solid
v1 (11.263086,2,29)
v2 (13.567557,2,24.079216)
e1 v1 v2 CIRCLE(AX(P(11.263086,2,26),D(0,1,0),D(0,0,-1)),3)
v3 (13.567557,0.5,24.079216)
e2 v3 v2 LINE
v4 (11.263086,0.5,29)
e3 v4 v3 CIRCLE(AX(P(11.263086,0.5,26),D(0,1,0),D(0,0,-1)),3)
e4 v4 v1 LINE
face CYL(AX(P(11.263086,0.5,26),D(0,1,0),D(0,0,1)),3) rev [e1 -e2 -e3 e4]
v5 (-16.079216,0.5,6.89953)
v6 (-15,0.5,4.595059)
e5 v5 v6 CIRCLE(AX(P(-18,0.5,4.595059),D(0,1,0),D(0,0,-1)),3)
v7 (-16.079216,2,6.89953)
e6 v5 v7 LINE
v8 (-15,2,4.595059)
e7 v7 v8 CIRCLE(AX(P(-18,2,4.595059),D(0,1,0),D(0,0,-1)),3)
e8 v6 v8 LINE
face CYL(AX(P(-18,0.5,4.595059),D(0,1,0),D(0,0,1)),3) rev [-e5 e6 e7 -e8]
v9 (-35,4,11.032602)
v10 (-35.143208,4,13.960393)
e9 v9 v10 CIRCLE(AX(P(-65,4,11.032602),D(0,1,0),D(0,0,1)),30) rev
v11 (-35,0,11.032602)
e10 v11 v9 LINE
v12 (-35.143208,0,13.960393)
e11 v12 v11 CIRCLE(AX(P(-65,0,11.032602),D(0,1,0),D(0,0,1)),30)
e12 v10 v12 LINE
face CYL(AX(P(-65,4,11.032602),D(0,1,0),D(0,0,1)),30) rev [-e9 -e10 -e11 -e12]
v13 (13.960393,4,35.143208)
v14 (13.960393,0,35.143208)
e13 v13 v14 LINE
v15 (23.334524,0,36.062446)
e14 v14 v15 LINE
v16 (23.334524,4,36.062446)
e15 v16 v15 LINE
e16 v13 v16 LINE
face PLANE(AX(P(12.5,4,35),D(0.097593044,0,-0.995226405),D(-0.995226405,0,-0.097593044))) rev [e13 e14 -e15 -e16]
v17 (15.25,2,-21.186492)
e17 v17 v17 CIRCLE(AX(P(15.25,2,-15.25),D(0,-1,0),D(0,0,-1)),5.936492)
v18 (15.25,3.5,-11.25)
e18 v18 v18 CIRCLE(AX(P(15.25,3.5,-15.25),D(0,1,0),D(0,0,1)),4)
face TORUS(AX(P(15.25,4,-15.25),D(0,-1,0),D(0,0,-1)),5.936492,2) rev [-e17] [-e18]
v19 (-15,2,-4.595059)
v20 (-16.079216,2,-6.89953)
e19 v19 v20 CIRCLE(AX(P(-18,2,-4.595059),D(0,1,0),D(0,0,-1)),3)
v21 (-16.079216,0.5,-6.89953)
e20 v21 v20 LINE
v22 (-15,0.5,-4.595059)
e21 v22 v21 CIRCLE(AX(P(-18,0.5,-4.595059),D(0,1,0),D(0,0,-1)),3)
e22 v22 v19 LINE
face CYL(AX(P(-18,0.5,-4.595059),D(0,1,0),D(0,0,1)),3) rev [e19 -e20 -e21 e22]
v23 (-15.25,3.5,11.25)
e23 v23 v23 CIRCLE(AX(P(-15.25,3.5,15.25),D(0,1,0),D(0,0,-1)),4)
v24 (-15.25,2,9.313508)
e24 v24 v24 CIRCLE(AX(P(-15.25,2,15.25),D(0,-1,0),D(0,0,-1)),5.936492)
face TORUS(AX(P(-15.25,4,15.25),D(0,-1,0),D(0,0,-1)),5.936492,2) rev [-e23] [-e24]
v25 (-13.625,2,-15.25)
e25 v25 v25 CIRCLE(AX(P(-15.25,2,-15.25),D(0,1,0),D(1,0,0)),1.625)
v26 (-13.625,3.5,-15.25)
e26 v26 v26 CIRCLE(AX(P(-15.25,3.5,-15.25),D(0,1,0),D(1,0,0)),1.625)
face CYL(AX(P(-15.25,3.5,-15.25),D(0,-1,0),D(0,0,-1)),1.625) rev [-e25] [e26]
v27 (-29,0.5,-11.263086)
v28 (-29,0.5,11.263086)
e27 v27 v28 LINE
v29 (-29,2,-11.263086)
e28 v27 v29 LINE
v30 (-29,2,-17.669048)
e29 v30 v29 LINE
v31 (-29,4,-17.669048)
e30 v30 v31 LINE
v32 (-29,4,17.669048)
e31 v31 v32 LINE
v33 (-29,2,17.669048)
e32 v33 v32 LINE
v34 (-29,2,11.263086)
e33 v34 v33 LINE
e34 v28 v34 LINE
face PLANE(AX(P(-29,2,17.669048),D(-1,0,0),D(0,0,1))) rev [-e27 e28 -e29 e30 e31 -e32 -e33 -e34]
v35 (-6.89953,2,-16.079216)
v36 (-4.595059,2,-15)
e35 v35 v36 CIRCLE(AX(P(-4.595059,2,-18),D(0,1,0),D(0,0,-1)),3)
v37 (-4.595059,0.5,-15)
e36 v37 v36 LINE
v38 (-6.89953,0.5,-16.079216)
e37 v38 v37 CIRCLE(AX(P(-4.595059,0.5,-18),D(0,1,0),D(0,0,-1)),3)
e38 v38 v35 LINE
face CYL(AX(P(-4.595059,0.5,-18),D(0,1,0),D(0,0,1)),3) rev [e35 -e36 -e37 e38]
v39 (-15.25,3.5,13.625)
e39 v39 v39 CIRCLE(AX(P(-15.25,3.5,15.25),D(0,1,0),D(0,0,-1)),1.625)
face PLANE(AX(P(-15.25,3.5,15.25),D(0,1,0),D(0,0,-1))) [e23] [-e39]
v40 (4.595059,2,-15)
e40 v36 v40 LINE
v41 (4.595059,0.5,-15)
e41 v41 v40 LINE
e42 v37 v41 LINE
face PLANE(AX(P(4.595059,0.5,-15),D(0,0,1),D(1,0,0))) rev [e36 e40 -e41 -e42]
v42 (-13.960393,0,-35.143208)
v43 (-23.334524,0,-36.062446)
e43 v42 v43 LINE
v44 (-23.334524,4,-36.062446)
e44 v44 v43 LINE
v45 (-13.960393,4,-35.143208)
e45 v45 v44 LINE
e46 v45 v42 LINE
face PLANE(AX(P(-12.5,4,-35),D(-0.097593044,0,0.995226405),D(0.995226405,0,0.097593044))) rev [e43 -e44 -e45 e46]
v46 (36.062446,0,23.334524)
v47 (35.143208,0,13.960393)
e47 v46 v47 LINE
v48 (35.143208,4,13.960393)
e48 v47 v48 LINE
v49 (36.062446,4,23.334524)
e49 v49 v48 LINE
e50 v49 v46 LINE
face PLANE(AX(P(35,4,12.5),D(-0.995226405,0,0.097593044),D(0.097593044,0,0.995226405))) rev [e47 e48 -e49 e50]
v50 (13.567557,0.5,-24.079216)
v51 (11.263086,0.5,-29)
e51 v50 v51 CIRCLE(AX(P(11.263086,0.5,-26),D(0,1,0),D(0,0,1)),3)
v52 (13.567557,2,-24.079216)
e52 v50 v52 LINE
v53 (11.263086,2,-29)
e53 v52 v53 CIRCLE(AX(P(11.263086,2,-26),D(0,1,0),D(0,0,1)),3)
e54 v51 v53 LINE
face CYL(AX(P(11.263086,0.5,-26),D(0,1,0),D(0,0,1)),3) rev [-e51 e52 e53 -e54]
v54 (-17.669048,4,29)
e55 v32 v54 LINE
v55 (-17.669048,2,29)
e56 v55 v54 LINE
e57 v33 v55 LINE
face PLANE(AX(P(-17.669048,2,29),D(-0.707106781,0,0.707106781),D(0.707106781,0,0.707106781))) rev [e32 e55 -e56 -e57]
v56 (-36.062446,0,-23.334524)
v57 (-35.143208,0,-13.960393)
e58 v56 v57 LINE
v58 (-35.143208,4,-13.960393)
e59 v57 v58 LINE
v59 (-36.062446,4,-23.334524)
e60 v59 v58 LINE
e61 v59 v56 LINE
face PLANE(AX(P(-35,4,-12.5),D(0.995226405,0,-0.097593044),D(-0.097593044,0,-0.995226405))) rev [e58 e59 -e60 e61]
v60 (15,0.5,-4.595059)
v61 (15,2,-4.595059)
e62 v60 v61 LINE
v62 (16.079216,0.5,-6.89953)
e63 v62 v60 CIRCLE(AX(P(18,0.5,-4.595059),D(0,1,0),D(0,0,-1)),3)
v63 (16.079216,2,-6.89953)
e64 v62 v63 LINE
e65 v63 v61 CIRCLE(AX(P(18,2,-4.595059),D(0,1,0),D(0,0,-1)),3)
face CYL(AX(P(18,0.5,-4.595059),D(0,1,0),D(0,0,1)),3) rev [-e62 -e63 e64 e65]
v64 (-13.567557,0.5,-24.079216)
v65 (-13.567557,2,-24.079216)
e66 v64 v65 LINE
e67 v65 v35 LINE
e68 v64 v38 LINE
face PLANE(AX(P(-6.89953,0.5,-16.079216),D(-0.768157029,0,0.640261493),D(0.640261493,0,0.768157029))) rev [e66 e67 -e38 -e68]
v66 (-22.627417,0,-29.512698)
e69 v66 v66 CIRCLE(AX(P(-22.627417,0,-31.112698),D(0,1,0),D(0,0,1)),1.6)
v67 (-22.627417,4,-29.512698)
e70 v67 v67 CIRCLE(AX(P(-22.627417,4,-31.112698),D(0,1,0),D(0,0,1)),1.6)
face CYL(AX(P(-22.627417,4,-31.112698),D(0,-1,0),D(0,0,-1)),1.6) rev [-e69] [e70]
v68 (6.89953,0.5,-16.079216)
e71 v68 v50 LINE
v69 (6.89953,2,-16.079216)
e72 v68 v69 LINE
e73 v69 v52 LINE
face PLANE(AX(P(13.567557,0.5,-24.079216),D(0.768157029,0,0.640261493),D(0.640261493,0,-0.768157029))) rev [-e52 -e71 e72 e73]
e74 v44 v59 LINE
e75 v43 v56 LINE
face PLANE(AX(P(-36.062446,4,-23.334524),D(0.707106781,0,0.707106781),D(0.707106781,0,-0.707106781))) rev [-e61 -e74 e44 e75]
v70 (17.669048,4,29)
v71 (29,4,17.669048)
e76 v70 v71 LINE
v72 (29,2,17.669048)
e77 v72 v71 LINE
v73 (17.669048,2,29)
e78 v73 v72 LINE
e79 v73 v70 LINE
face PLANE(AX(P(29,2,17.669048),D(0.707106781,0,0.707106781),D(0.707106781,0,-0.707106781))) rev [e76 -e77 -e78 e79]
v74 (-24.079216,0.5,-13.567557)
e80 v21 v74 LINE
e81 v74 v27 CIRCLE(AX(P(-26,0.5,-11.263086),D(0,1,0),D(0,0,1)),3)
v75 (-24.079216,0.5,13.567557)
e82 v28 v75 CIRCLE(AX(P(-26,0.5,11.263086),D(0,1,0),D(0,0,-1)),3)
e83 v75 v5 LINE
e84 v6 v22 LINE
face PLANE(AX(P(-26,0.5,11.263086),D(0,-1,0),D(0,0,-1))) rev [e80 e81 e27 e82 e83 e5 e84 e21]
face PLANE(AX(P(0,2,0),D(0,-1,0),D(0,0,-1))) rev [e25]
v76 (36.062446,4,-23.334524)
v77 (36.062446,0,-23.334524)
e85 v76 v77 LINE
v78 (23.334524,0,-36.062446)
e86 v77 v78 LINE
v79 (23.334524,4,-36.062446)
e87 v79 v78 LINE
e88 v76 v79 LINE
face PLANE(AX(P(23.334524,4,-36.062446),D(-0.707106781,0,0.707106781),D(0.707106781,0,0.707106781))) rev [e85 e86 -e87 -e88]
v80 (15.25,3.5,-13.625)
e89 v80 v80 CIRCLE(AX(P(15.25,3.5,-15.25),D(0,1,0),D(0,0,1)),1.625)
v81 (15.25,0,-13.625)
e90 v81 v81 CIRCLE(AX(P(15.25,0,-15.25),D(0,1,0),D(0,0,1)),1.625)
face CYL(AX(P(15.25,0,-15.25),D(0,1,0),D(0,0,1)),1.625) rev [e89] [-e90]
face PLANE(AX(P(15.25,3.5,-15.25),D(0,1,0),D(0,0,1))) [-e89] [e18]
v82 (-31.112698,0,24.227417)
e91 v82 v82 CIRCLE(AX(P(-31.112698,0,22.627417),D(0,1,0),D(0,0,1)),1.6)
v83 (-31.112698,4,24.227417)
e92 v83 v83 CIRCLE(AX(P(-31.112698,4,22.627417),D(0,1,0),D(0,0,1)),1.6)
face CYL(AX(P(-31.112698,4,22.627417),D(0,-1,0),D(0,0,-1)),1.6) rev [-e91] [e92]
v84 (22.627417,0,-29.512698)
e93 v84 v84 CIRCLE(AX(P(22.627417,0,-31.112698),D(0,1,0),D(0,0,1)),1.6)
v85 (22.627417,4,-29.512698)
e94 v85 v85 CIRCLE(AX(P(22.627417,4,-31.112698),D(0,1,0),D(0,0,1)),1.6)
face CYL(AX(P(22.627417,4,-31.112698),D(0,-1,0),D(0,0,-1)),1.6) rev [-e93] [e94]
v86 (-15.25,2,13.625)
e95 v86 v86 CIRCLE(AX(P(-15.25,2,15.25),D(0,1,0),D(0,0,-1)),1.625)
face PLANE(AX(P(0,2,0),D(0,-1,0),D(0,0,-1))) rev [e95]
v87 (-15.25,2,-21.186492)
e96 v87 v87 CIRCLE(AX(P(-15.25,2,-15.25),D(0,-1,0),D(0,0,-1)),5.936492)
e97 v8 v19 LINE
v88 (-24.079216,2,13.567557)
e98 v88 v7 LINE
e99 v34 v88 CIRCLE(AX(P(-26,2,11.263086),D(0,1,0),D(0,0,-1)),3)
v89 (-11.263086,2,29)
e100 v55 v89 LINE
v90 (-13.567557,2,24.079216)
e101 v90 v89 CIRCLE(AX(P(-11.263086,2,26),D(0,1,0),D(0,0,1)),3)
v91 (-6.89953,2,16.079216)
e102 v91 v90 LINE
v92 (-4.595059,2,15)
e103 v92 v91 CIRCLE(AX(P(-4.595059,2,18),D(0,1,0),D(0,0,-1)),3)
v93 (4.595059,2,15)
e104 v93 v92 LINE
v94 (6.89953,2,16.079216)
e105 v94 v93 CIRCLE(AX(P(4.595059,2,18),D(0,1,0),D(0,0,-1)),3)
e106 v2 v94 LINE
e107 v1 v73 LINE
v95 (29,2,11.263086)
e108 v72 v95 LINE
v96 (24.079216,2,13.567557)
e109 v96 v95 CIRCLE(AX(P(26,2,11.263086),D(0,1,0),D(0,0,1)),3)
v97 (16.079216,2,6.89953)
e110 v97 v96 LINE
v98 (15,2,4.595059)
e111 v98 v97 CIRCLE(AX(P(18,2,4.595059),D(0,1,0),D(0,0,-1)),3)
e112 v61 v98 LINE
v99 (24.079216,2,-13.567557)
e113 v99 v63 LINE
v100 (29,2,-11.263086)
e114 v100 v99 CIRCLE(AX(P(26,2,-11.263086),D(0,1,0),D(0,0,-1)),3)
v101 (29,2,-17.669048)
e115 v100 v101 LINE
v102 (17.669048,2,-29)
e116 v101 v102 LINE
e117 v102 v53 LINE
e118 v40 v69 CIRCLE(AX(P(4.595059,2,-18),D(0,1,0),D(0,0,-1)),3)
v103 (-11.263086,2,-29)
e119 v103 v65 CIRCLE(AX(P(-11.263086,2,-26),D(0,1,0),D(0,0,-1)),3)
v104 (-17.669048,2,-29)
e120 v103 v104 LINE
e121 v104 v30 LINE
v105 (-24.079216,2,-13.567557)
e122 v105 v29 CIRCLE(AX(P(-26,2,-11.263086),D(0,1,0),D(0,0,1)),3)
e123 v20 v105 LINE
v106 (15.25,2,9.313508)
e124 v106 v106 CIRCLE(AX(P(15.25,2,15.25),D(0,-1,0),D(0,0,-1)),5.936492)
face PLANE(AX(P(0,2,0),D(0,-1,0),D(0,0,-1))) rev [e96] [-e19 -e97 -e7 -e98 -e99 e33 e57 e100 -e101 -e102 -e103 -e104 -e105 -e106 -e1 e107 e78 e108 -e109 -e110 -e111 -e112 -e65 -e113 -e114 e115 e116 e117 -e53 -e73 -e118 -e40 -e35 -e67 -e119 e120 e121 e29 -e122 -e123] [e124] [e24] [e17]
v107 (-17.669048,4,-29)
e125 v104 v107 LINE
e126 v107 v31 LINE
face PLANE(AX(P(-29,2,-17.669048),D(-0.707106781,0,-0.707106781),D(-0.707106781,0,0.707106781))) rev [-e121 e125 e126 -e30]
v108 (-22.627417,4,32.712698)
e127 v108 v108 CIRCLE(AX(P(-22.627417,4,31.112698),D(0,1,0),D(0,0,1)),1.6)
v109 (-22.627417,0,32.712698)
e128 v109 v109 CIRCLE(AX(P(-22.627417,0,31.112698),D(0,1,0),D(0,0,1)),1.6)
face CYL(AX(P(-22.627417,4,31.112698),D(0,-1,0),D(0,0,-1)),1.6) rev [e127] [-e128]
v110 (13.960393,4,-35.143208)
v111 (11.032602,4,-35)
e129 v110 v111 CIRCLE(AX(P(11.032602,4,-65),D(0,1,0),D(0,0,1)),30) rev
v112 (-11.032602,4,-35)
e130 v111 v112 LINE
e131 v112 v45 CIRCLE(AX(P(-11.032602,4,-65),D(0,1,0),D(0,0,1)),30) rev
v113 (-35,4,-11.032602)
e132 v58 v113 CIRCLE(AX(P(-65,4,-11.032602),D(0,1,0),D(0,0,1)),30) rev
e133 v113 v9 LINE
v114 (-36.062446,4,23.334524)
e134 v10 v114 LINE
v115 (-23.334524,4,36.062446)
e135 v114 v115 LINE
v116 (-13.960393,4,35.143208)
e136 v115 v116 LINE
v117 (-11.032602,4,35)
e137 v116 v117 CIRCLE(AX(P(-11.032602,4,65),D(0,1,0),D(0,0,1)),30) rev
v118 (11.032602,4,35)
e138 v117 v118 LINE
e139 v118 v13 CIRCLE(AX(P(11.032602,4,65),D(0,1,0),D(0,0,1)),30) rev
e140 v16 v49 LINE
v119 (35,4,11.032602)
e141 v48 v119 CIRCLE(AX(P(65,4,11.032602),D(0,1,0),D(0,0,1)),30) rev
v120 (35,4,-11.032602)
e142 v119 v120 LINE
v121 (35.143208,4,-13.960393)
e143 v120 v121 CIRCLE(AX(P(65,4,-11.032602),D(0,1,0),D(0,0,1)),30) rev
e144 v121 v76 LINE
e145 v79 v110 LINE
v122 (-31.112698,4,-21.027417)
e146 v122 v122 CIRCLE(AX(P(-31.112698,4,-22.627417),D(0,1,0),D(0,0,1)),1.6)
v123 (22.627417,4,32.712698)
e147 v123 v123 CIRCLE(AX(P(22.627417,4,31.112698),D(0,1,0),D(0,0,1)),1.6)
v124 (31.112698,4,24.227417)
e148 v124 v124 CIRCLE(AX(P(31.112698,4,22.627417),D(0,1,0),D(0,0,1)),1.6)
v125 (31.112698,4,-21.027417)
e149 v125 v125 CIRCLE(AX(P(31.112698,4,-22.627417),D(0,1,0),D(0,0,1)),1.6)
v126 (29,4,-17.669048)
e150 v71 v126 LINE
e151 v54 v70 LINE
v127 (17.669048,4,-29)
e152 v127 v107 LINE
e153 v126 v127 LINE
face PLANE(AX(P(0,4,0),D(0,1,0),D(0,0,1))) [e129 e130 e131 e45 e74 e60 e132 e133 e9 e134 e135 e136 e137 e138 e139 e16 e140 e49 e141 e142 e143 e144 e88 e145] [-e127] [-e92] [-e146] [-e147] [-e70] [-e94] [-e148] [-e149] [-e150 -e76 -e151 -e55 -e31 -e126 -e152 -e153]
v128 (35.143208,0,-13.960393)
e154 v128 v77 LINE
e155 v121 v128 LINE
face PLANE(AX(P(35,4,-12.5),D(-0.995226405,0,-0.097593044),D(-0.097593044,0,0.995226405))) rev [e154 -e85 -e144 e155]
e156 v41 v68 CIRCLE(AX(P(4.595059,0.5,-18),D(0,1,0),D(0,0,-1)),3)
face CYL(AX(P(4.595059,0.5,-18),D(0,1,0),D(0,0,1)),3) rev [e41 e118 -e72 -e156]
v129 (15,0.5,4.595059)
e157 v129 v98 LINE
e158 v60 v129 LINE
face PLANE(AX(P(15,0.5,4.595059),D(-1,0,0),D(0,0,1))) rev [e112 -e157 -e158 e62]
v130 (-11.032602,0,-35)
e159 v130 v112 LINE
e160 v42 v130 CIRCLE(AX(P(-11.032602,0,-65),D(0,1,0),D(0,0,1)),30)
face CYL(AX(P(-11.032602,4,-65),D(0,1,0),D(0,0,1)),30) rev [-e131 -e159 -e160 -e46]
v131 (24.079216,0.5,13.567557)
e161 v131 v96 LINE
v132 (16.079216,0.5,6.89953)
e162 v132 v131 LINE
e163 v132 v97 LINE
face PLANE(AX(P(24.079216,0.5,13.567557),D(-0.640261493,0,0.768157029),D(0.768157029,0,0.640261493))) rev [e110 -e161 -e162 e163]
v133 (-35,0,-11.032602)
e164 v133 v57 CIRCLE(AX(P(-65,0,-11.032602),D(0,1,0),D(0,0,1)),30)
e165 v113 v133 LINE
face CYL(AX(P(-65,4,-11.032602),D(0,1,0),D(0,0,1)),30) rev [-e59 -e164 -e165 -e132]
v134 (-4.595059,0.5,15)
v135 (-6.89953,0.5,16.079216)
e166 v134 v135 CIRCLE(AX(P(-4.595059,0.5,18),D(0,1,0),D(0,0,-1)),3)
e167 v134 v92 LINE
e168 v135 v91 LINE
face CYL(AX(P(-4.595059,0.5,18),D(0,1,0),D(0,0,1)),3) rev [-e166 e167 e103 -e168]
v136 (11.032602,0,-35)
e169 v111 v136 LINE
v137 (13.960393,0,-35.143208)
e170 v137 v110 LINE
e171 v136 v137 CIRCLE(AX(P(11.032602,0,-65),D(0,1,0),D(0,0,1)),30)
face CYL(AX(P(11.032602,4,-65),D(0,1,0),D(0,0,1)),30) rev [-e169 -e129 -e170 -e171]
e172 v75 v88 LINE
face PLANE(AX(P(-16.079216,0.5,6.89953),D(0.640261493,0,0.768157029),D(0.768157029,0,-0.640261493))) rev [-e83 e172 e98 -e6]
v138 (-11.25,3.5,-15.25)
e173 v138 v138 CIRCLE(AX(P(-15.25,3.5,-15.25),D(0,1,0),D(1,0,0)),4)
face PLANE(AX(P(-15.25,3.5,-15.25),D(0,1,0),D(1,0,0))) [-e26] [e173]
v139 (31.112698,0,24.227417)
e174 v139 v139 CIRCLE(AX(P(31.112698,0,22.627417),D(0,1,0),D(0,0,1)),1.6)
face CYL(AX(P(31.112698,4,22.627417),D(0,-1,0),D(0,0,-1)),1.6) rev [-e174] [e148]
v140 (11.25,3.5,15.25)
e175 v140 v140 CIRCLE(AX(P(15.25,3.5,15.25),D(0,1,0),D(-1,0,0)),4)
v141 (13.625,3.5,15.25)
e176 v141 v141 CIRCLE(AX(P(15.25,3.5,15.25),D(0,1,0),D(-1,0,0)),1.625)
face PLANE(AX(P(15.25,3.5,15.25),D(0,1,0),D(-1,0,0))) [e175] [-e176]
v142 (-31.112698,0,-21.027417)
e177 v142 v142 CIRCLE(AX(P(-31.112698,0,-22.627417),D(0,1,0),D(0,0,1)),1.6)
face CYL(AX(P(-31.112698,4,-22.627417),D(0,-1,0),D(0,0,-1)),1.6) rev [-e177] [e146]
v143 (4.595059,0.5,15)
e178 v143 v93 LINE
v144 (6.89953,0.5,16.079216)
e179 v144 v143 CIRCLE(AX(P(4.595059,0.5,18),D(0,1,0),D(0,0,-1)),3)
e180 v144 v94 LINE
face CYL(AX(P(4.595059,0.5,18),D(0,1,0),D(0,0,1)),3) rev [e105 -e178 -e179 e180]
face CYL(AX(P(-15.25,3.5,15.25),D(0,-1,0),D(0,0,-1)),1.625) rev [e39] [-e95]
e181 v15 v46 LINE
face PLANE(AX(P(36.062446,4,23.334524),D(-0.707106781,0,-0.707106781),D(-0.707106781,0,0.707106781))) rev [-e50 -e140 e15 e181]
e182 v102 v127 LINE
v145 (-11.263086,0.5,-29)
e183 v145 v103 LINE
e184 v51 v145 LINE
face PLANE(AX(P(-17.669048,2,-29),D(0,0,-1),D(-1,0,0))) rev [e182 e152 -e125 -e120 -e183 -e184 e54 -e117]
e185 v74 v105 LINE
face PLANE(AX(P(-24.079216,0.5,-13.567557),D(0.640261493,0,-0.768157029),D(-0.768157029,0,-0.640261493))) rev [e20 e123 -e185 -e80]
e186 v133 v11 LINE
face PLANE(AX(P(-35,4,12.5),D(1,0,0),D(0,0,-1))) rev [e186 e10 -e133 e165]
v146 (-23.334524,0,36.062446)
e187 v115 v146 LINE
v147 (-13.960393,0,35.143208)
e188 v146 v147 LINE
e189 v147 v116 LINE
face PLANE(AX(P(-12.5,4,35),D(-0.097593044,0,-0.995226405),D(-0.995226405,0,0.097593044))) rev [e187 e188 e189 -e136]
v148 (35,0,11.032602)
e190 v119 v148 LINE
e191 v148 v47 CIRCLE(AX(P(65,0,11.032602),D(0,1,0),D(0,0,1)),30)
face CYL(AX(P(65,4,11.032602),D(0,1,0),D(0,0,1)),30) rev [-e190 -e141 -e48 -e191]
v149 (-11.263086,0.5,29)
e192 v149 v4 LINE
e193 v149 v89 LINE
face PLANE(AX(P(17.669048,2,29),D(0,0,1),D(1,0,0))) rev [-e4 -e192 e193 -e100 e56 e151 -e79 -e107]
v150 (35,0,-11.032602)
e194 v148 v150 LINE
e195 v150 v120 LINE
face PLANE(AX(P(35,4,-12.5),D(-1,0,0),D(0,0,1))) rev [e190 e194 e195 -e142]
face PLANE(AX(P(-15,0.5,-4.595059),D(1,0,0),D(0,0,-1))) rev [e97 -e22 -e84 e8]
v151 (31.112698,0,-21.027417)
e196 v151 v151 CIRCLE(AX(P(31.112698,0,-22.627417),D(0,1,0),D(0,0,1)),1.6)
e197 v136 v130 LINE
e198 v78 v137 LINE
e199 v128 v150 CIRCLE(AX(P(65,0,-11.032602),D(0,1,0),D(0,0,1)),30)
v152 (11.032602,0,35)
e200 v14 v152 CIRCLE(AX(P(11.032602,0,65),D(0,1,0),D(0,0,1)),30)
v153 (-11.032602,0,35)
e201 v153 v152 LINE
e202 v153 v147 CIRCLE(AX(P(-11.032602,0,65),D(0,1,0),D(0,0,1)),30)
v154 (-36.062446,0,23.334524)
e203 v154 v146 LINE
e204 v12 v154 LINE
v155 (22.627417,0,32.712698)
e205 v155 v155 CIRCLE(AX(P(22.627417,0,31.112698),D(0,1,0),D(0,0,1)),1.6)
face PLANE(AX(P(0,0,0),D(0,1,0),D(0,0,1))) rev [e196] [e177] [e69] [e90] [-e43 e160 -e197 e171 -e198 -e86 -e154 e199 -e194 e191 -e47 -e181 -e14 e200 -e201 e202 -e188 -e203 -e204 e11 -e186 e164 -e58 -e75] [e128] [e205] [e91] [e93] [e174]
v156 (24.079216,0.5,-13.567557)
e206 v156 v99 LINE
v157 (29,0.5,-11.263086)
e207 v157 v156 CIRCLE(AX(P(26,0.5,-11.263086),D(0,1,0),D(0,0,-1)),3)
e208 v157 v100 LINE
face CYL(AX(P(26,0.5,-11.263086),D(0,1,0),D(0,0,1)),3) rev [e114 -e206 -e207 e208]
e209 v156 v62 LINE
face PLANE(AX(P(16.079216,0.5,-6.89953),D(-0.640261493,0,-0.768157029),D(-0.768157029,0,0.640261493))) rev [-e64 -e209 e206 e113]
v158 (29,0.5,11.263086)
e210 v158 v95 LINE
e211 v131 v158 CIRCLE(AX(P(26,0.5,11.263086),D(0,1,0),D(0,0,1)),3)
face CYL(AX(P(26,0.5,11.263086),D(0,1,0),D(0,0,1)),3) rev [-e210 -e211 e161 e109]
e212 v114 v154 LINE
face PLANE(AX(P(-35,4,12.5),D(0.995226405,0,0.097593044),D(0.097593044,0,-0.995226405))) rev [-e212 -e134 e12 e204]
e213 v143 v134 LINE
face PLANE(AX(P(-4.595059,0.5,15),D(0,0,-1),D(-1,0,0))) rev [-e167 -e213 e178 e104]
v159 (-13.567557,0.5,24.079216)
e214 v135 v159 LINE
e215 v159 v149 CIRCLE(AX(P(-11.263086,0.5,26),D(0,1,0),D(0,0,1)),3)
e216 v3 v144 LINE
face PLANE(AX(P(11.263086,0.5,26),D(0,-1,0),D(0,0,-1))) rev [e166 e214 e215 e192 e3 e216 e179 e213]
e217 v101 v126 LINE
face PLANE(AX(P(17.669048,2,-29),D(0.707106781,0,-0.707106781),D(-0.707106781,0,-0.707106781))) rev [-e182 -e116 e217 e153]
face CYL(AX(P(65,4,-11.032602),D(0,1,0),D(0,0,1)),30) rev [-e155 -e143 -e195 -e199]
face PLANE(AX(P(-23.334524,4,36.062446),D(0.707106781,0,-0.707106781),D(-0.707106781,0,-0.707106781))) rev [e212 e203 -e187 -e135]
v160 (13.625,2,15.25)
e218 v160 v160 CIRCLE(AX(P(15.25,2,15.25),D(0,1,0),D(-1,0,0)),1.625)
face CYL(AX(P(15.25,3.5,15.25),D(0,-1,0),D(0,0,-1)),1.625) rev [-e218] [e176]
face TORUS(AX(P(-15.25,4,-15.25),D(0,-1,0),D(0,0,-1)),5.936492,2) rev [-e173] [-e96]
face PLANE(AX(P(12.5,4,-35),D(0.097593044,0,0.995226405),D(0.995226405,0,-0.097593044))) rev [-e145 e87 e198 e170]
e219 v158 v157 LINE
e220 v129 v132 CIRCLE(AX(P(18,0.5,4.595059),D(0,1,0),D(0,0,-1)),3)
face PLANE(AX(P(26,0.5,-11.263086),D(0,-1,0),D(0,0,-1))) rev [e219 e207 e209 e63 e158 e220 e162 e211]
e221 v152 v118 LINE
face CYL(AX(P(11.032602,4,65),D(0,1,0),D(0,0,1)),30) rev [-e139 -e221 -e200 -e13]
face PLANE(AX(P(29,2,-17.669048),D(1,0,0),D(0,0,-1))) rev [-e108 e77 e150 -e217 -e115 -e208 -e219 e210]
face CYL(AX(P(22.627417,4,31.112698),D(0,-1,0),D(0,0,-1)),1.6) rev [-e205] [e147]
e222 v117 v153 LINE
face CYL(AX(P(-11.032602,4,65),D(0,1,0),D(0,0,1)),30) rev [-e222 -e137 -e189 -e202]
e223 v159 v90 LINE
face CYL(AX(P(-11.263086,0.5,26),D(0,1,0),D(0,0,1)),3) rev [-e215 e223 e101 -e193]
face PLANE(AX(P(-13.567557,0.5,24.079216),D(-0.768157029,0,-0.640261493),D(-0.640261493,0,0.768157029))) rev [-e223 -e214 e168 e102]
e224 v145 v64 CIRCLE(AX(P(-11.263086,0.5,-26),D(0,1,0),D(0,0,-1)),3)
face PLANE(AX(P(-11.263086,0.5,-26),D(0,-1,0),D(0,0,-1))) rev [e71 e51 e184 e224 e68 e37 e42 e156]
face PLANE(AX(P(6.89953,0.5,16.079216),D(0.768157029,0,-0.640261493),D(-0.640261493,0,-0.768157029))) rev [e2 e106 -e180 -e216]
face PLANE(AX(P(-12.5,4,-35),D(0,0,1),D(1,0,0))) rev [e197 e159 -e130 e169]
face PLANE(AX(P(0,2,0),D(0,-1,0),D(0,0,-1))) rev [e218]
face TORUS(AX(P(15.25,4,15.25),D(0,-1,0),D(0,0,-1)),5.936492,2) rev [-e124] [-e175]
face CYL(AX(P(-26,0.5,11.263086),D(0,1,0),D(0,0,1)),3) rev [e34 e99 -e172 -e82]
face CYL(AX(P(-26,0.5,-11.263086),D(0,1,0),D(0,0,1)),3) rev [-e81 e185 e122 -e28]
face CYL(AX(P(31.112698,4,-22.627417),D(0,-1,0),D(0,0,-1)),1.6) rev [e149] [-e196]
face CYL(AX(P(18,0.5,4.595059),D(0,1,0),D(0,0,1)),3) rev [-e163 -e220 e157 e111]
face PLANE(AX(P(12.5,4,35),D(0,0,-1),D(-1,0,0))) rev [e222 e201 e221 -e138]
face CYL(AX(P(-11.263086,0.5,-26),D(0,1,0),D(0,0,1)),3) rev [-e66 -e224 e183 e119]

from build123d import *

# Parameters (mm, degrees)
SKETCH1_R           = 1.6
BOSS_EXTRUDE2_DEPTH = 4
CUT_EXTRUDE1_DEPTH  = 2
CUT_EXTRUDE2_DEPTH  = 1.5
SKETCH4_R           = 1.625
CUT_EXTRUDE3_DEPTH  = 52.039200621
BOSS_EXTRUDE3_START = 1.5
SKETCH5_R           = 4
SKETCH5_R_2         = 1.625
BOSS_EXTRUDE3_DEPTH = 1.5
CIRPATTERN1_COUNT   = 4
FILLET1_R           = 2
FILLET2_R           = 30


with BuildPart() as part:
    # Sketch1 → Boss-Extrude2 (new body)
    with BuildSketch(Plane(origin=(0, 0, 0), x_dir=(1, 0, 0), z_dir=(0, 1, 0))):
        Polygon((-12.5, 35), (12.5, 35), (23.334523779, 36.062445841), (36.062445841, 23.334523779), (35, 12.5), (35, -12.5), (36.062445841, -23.334523779), (23.334523779, -36.062445841), (12.5, -35), (-12.5, -35), (-23.334523779, -36.062445841), (-36.062445841, -23.334523779), (-35, -12.5), (-35, 12.5), (-36.062445841, 23.334523779), (-23.334523779, 36.062445841), align=None)
        with Locations(Location((22.627416998, 31.112698372, 0), (0, 0, 270))):
            Circle(SKETCH1_R, mode=Mode.SUBTRACT)
        with Locations(Location((31.112698372, 22.627416998, 0), (0, 0, 270))):
            Circle(SKETCH1_R, mode=Mode.SUBTRACT)
        with Locations(Location((22.627416998, -31.112698372, 0), (0, 0, 270))):
            Circle(SKETCH1_R, mode=Mode.SUBTRACT)
        with Locations(Location((31.112698372, -22.627416998, 0), (0, 0, 270))):
            Circle(SKETCH1_R, mode=Mode.SUBTRACT)
        with Locations(Location((-31.112698372, -22.627416998, 0), (0, 0, 270))):
            Circle(SKETCH1_R, mode=Mode.SUBTRACT)
        with Locations(Location((-22.627416998, -31.112698372, 0), (0, 0, 270))):
            Circle(SKETCH1_R, mode=Mode.SUBTRACT)
        with Locations(Location((-22.627416998, 31.112698372, 0), (0, 0, 270))):
            Circle(SKETCH1_R, mode=Mode.SUBTRACT)
        with Locations(Location((-31.112698372, 22.627416998, 0), (0, 0, 270))):
            Circle(SKETCH1_R, mode=Mode.SUBTRACT)
    extrude(amount=BOSS_EXTRUDE2_DEPTH)

    # Sketch2 → Cut-Extrude1 (cut)
    with BuildSketch(Plane(origin=(0, 4, 0), x_dir=(1, 0, 0), z_dir=(0, 1, 0))):
        Polygon((-17.669047558, 29), (17.669047558, 29), (29, 17.669047558), (29, -17.669047558), (17.669047558, -29), (-17.669047558, -29), (-29, -17.669047558), (-29, 17.669047558), align=None)
    extrude(amount=-CUT_EXTRUDE1_DEPTH, mode=Mode.SUBTRACT)

    # Sketch3 → Cut-Extrude2 (cut)
    with BuildSketch(Plane(origin=(0, 2, 0), x_dir=(1, 0, 0), z_dir=(0, 1, 0))):
        with BuildLine():
            Line((-24.079215521, 13.567556979), (-16.079215521, 6.899529803))
            ThreePointArc((-16.079215521, 6.899529803), (-15.283167889, 5.867388581), (-15, 4.595058717))
            Line((-15, 4.595058717), (-15, -4.595058717))
            ThreePointArc((-15, -4.595058717), (-15.283167889, -5.867388581), (-16.079215521, -6.899529803))
            Line((-16.079215521, -6.899529803), (-24.079215521, -13.567556979))
            ThreePointArc((-24.079215521, -13.567556979), (-27.272329864, -13.979918004), (-29, -11.263085893))
            Line((-29, -11.263085893), (-29, 11.263085893))
            ThreePointArc((-29, 11.263085893), (-27.272329864, 13.979918004), (-24.079215521, 13.567556979))
        make_face()
        with BuildLine():
            Line((13.567556979, 24.079215521), (6.899529803, 16.079215521))
            ThreePointArc((6.899529803, 16.079215521), (5.867388581, 15.283167889), (4.595058717, 15))
            Line((4.595058717, 15), (-4.595058717, 15))
            ThreePointArc((-4.595058717, 15), (-5.867388581, 15.283167889), (-6.899529803, 16.079215521))
            Line((-6.899529803, 16.079215521), (-13.567556979, 24.079215521))
            ThreePointArc((-13.567556979, 24.079215521), (-13.979918004, 27.272329864), (-11.263085893, 29))
            Line((-11.263085893, 29), (11.263085893, 29))
            ThreePointArc((11.263085893, 29), (13.979918004, 27.272329864), (13.567556979, 24.079215521))
        make_face()
        with BuildLine():
            Line((24.079215521, -13.567556979), (16.079215521, -6.899529803))
            ThreePointArc((16.079215521, -6.899529803), (15.283167889, -5.867388581), (15, -4.595058717))
            Line((15, -4.595058717), (15, 4.595058717))
            ThreePointArc((15, 4.595058717), (15.283167889, 5.867388581), (16.079215521, 6.899529803))
            Line((16.079215521, 6.899529803), (24.079215521, 13.567556979))
            ThreePointArc((24.079215521, 13.567556979), (27.272329864, 13.979918004), (29, 11.263085893))
            Line((29, 11.263085893), (29, -11.263085893))
            ThreePointArc((29, -11.263085893), (27.272329864, -13.979918004), (24.079215521, -13.567556979))
        make_face()
        with BuildLine():
            Line((-13.567556979, -24.079215521), (-6.899529803, -16.079215521))
            ThreePointArc((-6.899529803, -16.079215521), (-5.867388581, -15.283167889), (-4.595058717, -15))
            Line((-4.595058717, -15), (4.595058717, -15))
            ThreePointArc((4.595058717, -15), (5.867388581, -15.283167889), (6.899529803, -16.079215521))
            Line((6.899529803, -16.079215521), (13.567556979, -24.079215521))
            ThreePointArc((13.567556979, -24.079215521), (13.979918004, -27.272329864), (11.263085893, -29))
            Line((11.263085893, -29), (-11.263085893, -29))
            ThreePointArc((-11.263085893, -29), (-13.979918004, -27.272329864), (-13.567556979, -24.079215521))
        make_face()
    extrude(amount=-CUT_EXTRUDE2_DEPTH, mode=Mode.SUBTRACT)

    # Sketch4 → Cut-Extrude3 (cut, through all)
    with BuildSketch(Plane(origin=(0, 2, 0), x_dir=(1, 0, 0), z_dir=(0, 1, 0))):
        with Locations(Location((15.25, 15.25, 0), (0, 0, 270))):
            Circle(SKETCH4_R)
    extrude(amount=-CUT_EXTRUDE3_DEPTH, mode=Mode.SUBTRACT)

    # Sketch5 → Boss-Extrude3 (add)
    with BuildSketch(Plane(origin=(0, 2, 0), x_dir=(1, 0, 0), z_dir=(0, 1, 0)).offset(BOSS_EXTRUDE3_START)):
        with Locations(Location((15.25, 15.25, 0), (0, 0, 90))):
            Circle(SKETCH5_R)
        with Locations(Location((15.25, 15.25, 0), (0, 0, 270))):
            Circle(SKETCH5_R_2, mode=Mode.SUBTRACT)
    boss_extrude3 = extrude(amount=-BOSS_EXTRUDE3_DEPTH)

    # CirPattern1: Boss-Extrude3 ×4 about axis
    cirpattern1_axis = Axis((0, 0, 0), (0, 1, 0))
    for i in range(1, CIRPATTERN1_COUNT):
        add(boss_extrude3.rotate(cirpattern1_axis, i * 360 / CIRPATTERN1_COUNT))

    # Fillet1
    # the kernel refuses this fillet: 2 mm, written as the material it adds along each edge
    with BuildSketch(Plane(origin=(15.25, 2, -15.25), x_dir=(0, 0, -1), z_dir=(1, 0, 0))) as fillet1_piece_1:
        with BuildLine():
            CenterArc((5.936491673, 2), FILLET1_R, 194.477512186, 75.522487814)
            Line((4, 1.5), (3.961270167, 1.49))
            ThreePointArc((3.961270167, 1.49), (3.96, 0.75), (3.96, 0))
            Line((3.96, 0), (4, -0.04))
            Line((4, -0.04), (5.936491673, -0.04))
            Line((5.936491673, -0.04), (5.936491673, 0))
        make_face()
    revolve(axis=Axis((15.25, 2, -15.25), (0, 1, 0)))
    with BuildSketch(Plane(origin=(15.25, 2, 15.25), x_dir=(1, 0, 0), z_dir=(0, 0, 1))) as fillet1_piece_2:
        with BuildLine():
            CenterArc((5.936491673, 2), FILLET1_R, 194.477512186, 75.522487814)
            Line((4, 1.5), (3.961270167, 1.49))
            ThreePointArc((3.961270167, 1.49), (3.96, 0.75), (3.96, 0))
            Line((3.96, 0), (4, -0.04))
            Line((4, -0.04), (5.936491673, -0.04))
            Line((5.936491673, -0.04), (5.936491673, 0))
        make_face()
    revolve(axis=Axis((15.25, 2, 15.25), (0, 1, 0)))
    with BuildSketch(Plane(origin=(-15.25, 2, 15.25), x_dir=(0, 0, 1), z_dir=(-1, 0, 0))) as fillet1_piece_3:
        with BuildLine():
            CenterArc((5.936491673, 2), FILLET1_R, 194.477512186, 75.522487814)
            Line((4, 1.5), (3.961270167, 1.49))
            ThreePointArc((3.961270167, 1.49), (3.96, 0.75), (3.96, 0))
            Line((3.96, 0), (4, -0.04))
            Line((4, -0.04), (5.936491673, -0.04))
            Line((5.936491673, -0.04), (5.936491673, 0))
        make_face()
    revolve(axis=Axis((-15.25, 2, 15.25), (0, 1, 0)))
    with BuildSketch(Plane(origin=(-15.25, 2, -15.25), x_dir=(-1, 0, 0), z_dir=(0, 0, -1))) as fillet1_piece_4:
        with BuildLine():
            CenterArc((5.936491673, 2), FILLET1_R, 194.477512186, 75.522487814)
            Line((4, 1.5), (3.961270167, 1.49))
            ThreePointArc((3.961270167, 1.49), (3.96, 0.75), (3.96, 0))
            Line((3.96, 0), (4, -0.04))
            Line((4, -0.04), (5.936491673, -0.04))
            Line((5.936491673, -0.04), (5.936491673, 0))
        make_face()
    revolve(axis=Axis((-15.25, 2, -15.25), (0, 1, 0)))

    # Fillet2
    # the kernel refuses this fillet: 30 mm, written as the material it adds along each edge
    with BuildSketch(Plane(origin=(-12.5, 0, -35), x_dir=(1, 0, 0), z_dir=(0, 1, 0)), Plane(origin=(-12.5, 0, 35), x_dir=(-0.995226405289247, 0, 0.09759304388655687), z_dir=(0, 1, 0)), Plane(origin=(-35, 0, 12.5), x_dir=(0, 0, -1), z_dir=(0, 1, 0)), Plane(origin=(-35, 0, -12.5), x_dir=(-0.09759304388656588, 0, -0.9952264052892461), z_dir=(0, 1, 0))) as fillet2_piece_1:
        with BuildLine():
            CenterArc((FILLET2_R * 0.0489132680017, FILLET2_R), FILLET2_R, 264.399415997, 5.600584003)
            Line((-FILLET2_R * 0.0486797758843, FILLET2_R * 0.0047735947107), (0, 0))
            Line((0, 0), (FILLET2_R * 0.0489132680017, 0))
        make_face()
    extrude(amount=4)
    with BuildSketch(Plane(origin=(12.5, 0, -35), x_dir=(-1, 0, 0), z_dir=(0, 1, 0)), Plane(origin=(35, 0, -12.5), x_dir=(0.09759304388597295, 0, -0.9952264052893043), z_dir=(0, 1, 0)), Plane(origin=(35, 0, 12.5), x_dir=(0, 0, -1), z_dir=(0, 1, 0)), Plane(origin=(12.5, 0, 35), x_dir=(0.9952264052893042, 0, 0.09759304388597305), z_dir=(0, 1, 0))) as fillet2_piece_2:
        with BuildLine():
            CenterArc((FILLET2_R * 0.048913268002, -FILLET2_R), FILLET2_R, 90, 5.600584003)
            Line((-FILLET2_R * 0.0486797758846, -FILLET2_R * 0.00477359471075), (0, 0))
            Line((0, 0), (FILLET2_R * 0.048913268002, 0))
        make_face()
    extrude(amount=4)


solid = part.part
